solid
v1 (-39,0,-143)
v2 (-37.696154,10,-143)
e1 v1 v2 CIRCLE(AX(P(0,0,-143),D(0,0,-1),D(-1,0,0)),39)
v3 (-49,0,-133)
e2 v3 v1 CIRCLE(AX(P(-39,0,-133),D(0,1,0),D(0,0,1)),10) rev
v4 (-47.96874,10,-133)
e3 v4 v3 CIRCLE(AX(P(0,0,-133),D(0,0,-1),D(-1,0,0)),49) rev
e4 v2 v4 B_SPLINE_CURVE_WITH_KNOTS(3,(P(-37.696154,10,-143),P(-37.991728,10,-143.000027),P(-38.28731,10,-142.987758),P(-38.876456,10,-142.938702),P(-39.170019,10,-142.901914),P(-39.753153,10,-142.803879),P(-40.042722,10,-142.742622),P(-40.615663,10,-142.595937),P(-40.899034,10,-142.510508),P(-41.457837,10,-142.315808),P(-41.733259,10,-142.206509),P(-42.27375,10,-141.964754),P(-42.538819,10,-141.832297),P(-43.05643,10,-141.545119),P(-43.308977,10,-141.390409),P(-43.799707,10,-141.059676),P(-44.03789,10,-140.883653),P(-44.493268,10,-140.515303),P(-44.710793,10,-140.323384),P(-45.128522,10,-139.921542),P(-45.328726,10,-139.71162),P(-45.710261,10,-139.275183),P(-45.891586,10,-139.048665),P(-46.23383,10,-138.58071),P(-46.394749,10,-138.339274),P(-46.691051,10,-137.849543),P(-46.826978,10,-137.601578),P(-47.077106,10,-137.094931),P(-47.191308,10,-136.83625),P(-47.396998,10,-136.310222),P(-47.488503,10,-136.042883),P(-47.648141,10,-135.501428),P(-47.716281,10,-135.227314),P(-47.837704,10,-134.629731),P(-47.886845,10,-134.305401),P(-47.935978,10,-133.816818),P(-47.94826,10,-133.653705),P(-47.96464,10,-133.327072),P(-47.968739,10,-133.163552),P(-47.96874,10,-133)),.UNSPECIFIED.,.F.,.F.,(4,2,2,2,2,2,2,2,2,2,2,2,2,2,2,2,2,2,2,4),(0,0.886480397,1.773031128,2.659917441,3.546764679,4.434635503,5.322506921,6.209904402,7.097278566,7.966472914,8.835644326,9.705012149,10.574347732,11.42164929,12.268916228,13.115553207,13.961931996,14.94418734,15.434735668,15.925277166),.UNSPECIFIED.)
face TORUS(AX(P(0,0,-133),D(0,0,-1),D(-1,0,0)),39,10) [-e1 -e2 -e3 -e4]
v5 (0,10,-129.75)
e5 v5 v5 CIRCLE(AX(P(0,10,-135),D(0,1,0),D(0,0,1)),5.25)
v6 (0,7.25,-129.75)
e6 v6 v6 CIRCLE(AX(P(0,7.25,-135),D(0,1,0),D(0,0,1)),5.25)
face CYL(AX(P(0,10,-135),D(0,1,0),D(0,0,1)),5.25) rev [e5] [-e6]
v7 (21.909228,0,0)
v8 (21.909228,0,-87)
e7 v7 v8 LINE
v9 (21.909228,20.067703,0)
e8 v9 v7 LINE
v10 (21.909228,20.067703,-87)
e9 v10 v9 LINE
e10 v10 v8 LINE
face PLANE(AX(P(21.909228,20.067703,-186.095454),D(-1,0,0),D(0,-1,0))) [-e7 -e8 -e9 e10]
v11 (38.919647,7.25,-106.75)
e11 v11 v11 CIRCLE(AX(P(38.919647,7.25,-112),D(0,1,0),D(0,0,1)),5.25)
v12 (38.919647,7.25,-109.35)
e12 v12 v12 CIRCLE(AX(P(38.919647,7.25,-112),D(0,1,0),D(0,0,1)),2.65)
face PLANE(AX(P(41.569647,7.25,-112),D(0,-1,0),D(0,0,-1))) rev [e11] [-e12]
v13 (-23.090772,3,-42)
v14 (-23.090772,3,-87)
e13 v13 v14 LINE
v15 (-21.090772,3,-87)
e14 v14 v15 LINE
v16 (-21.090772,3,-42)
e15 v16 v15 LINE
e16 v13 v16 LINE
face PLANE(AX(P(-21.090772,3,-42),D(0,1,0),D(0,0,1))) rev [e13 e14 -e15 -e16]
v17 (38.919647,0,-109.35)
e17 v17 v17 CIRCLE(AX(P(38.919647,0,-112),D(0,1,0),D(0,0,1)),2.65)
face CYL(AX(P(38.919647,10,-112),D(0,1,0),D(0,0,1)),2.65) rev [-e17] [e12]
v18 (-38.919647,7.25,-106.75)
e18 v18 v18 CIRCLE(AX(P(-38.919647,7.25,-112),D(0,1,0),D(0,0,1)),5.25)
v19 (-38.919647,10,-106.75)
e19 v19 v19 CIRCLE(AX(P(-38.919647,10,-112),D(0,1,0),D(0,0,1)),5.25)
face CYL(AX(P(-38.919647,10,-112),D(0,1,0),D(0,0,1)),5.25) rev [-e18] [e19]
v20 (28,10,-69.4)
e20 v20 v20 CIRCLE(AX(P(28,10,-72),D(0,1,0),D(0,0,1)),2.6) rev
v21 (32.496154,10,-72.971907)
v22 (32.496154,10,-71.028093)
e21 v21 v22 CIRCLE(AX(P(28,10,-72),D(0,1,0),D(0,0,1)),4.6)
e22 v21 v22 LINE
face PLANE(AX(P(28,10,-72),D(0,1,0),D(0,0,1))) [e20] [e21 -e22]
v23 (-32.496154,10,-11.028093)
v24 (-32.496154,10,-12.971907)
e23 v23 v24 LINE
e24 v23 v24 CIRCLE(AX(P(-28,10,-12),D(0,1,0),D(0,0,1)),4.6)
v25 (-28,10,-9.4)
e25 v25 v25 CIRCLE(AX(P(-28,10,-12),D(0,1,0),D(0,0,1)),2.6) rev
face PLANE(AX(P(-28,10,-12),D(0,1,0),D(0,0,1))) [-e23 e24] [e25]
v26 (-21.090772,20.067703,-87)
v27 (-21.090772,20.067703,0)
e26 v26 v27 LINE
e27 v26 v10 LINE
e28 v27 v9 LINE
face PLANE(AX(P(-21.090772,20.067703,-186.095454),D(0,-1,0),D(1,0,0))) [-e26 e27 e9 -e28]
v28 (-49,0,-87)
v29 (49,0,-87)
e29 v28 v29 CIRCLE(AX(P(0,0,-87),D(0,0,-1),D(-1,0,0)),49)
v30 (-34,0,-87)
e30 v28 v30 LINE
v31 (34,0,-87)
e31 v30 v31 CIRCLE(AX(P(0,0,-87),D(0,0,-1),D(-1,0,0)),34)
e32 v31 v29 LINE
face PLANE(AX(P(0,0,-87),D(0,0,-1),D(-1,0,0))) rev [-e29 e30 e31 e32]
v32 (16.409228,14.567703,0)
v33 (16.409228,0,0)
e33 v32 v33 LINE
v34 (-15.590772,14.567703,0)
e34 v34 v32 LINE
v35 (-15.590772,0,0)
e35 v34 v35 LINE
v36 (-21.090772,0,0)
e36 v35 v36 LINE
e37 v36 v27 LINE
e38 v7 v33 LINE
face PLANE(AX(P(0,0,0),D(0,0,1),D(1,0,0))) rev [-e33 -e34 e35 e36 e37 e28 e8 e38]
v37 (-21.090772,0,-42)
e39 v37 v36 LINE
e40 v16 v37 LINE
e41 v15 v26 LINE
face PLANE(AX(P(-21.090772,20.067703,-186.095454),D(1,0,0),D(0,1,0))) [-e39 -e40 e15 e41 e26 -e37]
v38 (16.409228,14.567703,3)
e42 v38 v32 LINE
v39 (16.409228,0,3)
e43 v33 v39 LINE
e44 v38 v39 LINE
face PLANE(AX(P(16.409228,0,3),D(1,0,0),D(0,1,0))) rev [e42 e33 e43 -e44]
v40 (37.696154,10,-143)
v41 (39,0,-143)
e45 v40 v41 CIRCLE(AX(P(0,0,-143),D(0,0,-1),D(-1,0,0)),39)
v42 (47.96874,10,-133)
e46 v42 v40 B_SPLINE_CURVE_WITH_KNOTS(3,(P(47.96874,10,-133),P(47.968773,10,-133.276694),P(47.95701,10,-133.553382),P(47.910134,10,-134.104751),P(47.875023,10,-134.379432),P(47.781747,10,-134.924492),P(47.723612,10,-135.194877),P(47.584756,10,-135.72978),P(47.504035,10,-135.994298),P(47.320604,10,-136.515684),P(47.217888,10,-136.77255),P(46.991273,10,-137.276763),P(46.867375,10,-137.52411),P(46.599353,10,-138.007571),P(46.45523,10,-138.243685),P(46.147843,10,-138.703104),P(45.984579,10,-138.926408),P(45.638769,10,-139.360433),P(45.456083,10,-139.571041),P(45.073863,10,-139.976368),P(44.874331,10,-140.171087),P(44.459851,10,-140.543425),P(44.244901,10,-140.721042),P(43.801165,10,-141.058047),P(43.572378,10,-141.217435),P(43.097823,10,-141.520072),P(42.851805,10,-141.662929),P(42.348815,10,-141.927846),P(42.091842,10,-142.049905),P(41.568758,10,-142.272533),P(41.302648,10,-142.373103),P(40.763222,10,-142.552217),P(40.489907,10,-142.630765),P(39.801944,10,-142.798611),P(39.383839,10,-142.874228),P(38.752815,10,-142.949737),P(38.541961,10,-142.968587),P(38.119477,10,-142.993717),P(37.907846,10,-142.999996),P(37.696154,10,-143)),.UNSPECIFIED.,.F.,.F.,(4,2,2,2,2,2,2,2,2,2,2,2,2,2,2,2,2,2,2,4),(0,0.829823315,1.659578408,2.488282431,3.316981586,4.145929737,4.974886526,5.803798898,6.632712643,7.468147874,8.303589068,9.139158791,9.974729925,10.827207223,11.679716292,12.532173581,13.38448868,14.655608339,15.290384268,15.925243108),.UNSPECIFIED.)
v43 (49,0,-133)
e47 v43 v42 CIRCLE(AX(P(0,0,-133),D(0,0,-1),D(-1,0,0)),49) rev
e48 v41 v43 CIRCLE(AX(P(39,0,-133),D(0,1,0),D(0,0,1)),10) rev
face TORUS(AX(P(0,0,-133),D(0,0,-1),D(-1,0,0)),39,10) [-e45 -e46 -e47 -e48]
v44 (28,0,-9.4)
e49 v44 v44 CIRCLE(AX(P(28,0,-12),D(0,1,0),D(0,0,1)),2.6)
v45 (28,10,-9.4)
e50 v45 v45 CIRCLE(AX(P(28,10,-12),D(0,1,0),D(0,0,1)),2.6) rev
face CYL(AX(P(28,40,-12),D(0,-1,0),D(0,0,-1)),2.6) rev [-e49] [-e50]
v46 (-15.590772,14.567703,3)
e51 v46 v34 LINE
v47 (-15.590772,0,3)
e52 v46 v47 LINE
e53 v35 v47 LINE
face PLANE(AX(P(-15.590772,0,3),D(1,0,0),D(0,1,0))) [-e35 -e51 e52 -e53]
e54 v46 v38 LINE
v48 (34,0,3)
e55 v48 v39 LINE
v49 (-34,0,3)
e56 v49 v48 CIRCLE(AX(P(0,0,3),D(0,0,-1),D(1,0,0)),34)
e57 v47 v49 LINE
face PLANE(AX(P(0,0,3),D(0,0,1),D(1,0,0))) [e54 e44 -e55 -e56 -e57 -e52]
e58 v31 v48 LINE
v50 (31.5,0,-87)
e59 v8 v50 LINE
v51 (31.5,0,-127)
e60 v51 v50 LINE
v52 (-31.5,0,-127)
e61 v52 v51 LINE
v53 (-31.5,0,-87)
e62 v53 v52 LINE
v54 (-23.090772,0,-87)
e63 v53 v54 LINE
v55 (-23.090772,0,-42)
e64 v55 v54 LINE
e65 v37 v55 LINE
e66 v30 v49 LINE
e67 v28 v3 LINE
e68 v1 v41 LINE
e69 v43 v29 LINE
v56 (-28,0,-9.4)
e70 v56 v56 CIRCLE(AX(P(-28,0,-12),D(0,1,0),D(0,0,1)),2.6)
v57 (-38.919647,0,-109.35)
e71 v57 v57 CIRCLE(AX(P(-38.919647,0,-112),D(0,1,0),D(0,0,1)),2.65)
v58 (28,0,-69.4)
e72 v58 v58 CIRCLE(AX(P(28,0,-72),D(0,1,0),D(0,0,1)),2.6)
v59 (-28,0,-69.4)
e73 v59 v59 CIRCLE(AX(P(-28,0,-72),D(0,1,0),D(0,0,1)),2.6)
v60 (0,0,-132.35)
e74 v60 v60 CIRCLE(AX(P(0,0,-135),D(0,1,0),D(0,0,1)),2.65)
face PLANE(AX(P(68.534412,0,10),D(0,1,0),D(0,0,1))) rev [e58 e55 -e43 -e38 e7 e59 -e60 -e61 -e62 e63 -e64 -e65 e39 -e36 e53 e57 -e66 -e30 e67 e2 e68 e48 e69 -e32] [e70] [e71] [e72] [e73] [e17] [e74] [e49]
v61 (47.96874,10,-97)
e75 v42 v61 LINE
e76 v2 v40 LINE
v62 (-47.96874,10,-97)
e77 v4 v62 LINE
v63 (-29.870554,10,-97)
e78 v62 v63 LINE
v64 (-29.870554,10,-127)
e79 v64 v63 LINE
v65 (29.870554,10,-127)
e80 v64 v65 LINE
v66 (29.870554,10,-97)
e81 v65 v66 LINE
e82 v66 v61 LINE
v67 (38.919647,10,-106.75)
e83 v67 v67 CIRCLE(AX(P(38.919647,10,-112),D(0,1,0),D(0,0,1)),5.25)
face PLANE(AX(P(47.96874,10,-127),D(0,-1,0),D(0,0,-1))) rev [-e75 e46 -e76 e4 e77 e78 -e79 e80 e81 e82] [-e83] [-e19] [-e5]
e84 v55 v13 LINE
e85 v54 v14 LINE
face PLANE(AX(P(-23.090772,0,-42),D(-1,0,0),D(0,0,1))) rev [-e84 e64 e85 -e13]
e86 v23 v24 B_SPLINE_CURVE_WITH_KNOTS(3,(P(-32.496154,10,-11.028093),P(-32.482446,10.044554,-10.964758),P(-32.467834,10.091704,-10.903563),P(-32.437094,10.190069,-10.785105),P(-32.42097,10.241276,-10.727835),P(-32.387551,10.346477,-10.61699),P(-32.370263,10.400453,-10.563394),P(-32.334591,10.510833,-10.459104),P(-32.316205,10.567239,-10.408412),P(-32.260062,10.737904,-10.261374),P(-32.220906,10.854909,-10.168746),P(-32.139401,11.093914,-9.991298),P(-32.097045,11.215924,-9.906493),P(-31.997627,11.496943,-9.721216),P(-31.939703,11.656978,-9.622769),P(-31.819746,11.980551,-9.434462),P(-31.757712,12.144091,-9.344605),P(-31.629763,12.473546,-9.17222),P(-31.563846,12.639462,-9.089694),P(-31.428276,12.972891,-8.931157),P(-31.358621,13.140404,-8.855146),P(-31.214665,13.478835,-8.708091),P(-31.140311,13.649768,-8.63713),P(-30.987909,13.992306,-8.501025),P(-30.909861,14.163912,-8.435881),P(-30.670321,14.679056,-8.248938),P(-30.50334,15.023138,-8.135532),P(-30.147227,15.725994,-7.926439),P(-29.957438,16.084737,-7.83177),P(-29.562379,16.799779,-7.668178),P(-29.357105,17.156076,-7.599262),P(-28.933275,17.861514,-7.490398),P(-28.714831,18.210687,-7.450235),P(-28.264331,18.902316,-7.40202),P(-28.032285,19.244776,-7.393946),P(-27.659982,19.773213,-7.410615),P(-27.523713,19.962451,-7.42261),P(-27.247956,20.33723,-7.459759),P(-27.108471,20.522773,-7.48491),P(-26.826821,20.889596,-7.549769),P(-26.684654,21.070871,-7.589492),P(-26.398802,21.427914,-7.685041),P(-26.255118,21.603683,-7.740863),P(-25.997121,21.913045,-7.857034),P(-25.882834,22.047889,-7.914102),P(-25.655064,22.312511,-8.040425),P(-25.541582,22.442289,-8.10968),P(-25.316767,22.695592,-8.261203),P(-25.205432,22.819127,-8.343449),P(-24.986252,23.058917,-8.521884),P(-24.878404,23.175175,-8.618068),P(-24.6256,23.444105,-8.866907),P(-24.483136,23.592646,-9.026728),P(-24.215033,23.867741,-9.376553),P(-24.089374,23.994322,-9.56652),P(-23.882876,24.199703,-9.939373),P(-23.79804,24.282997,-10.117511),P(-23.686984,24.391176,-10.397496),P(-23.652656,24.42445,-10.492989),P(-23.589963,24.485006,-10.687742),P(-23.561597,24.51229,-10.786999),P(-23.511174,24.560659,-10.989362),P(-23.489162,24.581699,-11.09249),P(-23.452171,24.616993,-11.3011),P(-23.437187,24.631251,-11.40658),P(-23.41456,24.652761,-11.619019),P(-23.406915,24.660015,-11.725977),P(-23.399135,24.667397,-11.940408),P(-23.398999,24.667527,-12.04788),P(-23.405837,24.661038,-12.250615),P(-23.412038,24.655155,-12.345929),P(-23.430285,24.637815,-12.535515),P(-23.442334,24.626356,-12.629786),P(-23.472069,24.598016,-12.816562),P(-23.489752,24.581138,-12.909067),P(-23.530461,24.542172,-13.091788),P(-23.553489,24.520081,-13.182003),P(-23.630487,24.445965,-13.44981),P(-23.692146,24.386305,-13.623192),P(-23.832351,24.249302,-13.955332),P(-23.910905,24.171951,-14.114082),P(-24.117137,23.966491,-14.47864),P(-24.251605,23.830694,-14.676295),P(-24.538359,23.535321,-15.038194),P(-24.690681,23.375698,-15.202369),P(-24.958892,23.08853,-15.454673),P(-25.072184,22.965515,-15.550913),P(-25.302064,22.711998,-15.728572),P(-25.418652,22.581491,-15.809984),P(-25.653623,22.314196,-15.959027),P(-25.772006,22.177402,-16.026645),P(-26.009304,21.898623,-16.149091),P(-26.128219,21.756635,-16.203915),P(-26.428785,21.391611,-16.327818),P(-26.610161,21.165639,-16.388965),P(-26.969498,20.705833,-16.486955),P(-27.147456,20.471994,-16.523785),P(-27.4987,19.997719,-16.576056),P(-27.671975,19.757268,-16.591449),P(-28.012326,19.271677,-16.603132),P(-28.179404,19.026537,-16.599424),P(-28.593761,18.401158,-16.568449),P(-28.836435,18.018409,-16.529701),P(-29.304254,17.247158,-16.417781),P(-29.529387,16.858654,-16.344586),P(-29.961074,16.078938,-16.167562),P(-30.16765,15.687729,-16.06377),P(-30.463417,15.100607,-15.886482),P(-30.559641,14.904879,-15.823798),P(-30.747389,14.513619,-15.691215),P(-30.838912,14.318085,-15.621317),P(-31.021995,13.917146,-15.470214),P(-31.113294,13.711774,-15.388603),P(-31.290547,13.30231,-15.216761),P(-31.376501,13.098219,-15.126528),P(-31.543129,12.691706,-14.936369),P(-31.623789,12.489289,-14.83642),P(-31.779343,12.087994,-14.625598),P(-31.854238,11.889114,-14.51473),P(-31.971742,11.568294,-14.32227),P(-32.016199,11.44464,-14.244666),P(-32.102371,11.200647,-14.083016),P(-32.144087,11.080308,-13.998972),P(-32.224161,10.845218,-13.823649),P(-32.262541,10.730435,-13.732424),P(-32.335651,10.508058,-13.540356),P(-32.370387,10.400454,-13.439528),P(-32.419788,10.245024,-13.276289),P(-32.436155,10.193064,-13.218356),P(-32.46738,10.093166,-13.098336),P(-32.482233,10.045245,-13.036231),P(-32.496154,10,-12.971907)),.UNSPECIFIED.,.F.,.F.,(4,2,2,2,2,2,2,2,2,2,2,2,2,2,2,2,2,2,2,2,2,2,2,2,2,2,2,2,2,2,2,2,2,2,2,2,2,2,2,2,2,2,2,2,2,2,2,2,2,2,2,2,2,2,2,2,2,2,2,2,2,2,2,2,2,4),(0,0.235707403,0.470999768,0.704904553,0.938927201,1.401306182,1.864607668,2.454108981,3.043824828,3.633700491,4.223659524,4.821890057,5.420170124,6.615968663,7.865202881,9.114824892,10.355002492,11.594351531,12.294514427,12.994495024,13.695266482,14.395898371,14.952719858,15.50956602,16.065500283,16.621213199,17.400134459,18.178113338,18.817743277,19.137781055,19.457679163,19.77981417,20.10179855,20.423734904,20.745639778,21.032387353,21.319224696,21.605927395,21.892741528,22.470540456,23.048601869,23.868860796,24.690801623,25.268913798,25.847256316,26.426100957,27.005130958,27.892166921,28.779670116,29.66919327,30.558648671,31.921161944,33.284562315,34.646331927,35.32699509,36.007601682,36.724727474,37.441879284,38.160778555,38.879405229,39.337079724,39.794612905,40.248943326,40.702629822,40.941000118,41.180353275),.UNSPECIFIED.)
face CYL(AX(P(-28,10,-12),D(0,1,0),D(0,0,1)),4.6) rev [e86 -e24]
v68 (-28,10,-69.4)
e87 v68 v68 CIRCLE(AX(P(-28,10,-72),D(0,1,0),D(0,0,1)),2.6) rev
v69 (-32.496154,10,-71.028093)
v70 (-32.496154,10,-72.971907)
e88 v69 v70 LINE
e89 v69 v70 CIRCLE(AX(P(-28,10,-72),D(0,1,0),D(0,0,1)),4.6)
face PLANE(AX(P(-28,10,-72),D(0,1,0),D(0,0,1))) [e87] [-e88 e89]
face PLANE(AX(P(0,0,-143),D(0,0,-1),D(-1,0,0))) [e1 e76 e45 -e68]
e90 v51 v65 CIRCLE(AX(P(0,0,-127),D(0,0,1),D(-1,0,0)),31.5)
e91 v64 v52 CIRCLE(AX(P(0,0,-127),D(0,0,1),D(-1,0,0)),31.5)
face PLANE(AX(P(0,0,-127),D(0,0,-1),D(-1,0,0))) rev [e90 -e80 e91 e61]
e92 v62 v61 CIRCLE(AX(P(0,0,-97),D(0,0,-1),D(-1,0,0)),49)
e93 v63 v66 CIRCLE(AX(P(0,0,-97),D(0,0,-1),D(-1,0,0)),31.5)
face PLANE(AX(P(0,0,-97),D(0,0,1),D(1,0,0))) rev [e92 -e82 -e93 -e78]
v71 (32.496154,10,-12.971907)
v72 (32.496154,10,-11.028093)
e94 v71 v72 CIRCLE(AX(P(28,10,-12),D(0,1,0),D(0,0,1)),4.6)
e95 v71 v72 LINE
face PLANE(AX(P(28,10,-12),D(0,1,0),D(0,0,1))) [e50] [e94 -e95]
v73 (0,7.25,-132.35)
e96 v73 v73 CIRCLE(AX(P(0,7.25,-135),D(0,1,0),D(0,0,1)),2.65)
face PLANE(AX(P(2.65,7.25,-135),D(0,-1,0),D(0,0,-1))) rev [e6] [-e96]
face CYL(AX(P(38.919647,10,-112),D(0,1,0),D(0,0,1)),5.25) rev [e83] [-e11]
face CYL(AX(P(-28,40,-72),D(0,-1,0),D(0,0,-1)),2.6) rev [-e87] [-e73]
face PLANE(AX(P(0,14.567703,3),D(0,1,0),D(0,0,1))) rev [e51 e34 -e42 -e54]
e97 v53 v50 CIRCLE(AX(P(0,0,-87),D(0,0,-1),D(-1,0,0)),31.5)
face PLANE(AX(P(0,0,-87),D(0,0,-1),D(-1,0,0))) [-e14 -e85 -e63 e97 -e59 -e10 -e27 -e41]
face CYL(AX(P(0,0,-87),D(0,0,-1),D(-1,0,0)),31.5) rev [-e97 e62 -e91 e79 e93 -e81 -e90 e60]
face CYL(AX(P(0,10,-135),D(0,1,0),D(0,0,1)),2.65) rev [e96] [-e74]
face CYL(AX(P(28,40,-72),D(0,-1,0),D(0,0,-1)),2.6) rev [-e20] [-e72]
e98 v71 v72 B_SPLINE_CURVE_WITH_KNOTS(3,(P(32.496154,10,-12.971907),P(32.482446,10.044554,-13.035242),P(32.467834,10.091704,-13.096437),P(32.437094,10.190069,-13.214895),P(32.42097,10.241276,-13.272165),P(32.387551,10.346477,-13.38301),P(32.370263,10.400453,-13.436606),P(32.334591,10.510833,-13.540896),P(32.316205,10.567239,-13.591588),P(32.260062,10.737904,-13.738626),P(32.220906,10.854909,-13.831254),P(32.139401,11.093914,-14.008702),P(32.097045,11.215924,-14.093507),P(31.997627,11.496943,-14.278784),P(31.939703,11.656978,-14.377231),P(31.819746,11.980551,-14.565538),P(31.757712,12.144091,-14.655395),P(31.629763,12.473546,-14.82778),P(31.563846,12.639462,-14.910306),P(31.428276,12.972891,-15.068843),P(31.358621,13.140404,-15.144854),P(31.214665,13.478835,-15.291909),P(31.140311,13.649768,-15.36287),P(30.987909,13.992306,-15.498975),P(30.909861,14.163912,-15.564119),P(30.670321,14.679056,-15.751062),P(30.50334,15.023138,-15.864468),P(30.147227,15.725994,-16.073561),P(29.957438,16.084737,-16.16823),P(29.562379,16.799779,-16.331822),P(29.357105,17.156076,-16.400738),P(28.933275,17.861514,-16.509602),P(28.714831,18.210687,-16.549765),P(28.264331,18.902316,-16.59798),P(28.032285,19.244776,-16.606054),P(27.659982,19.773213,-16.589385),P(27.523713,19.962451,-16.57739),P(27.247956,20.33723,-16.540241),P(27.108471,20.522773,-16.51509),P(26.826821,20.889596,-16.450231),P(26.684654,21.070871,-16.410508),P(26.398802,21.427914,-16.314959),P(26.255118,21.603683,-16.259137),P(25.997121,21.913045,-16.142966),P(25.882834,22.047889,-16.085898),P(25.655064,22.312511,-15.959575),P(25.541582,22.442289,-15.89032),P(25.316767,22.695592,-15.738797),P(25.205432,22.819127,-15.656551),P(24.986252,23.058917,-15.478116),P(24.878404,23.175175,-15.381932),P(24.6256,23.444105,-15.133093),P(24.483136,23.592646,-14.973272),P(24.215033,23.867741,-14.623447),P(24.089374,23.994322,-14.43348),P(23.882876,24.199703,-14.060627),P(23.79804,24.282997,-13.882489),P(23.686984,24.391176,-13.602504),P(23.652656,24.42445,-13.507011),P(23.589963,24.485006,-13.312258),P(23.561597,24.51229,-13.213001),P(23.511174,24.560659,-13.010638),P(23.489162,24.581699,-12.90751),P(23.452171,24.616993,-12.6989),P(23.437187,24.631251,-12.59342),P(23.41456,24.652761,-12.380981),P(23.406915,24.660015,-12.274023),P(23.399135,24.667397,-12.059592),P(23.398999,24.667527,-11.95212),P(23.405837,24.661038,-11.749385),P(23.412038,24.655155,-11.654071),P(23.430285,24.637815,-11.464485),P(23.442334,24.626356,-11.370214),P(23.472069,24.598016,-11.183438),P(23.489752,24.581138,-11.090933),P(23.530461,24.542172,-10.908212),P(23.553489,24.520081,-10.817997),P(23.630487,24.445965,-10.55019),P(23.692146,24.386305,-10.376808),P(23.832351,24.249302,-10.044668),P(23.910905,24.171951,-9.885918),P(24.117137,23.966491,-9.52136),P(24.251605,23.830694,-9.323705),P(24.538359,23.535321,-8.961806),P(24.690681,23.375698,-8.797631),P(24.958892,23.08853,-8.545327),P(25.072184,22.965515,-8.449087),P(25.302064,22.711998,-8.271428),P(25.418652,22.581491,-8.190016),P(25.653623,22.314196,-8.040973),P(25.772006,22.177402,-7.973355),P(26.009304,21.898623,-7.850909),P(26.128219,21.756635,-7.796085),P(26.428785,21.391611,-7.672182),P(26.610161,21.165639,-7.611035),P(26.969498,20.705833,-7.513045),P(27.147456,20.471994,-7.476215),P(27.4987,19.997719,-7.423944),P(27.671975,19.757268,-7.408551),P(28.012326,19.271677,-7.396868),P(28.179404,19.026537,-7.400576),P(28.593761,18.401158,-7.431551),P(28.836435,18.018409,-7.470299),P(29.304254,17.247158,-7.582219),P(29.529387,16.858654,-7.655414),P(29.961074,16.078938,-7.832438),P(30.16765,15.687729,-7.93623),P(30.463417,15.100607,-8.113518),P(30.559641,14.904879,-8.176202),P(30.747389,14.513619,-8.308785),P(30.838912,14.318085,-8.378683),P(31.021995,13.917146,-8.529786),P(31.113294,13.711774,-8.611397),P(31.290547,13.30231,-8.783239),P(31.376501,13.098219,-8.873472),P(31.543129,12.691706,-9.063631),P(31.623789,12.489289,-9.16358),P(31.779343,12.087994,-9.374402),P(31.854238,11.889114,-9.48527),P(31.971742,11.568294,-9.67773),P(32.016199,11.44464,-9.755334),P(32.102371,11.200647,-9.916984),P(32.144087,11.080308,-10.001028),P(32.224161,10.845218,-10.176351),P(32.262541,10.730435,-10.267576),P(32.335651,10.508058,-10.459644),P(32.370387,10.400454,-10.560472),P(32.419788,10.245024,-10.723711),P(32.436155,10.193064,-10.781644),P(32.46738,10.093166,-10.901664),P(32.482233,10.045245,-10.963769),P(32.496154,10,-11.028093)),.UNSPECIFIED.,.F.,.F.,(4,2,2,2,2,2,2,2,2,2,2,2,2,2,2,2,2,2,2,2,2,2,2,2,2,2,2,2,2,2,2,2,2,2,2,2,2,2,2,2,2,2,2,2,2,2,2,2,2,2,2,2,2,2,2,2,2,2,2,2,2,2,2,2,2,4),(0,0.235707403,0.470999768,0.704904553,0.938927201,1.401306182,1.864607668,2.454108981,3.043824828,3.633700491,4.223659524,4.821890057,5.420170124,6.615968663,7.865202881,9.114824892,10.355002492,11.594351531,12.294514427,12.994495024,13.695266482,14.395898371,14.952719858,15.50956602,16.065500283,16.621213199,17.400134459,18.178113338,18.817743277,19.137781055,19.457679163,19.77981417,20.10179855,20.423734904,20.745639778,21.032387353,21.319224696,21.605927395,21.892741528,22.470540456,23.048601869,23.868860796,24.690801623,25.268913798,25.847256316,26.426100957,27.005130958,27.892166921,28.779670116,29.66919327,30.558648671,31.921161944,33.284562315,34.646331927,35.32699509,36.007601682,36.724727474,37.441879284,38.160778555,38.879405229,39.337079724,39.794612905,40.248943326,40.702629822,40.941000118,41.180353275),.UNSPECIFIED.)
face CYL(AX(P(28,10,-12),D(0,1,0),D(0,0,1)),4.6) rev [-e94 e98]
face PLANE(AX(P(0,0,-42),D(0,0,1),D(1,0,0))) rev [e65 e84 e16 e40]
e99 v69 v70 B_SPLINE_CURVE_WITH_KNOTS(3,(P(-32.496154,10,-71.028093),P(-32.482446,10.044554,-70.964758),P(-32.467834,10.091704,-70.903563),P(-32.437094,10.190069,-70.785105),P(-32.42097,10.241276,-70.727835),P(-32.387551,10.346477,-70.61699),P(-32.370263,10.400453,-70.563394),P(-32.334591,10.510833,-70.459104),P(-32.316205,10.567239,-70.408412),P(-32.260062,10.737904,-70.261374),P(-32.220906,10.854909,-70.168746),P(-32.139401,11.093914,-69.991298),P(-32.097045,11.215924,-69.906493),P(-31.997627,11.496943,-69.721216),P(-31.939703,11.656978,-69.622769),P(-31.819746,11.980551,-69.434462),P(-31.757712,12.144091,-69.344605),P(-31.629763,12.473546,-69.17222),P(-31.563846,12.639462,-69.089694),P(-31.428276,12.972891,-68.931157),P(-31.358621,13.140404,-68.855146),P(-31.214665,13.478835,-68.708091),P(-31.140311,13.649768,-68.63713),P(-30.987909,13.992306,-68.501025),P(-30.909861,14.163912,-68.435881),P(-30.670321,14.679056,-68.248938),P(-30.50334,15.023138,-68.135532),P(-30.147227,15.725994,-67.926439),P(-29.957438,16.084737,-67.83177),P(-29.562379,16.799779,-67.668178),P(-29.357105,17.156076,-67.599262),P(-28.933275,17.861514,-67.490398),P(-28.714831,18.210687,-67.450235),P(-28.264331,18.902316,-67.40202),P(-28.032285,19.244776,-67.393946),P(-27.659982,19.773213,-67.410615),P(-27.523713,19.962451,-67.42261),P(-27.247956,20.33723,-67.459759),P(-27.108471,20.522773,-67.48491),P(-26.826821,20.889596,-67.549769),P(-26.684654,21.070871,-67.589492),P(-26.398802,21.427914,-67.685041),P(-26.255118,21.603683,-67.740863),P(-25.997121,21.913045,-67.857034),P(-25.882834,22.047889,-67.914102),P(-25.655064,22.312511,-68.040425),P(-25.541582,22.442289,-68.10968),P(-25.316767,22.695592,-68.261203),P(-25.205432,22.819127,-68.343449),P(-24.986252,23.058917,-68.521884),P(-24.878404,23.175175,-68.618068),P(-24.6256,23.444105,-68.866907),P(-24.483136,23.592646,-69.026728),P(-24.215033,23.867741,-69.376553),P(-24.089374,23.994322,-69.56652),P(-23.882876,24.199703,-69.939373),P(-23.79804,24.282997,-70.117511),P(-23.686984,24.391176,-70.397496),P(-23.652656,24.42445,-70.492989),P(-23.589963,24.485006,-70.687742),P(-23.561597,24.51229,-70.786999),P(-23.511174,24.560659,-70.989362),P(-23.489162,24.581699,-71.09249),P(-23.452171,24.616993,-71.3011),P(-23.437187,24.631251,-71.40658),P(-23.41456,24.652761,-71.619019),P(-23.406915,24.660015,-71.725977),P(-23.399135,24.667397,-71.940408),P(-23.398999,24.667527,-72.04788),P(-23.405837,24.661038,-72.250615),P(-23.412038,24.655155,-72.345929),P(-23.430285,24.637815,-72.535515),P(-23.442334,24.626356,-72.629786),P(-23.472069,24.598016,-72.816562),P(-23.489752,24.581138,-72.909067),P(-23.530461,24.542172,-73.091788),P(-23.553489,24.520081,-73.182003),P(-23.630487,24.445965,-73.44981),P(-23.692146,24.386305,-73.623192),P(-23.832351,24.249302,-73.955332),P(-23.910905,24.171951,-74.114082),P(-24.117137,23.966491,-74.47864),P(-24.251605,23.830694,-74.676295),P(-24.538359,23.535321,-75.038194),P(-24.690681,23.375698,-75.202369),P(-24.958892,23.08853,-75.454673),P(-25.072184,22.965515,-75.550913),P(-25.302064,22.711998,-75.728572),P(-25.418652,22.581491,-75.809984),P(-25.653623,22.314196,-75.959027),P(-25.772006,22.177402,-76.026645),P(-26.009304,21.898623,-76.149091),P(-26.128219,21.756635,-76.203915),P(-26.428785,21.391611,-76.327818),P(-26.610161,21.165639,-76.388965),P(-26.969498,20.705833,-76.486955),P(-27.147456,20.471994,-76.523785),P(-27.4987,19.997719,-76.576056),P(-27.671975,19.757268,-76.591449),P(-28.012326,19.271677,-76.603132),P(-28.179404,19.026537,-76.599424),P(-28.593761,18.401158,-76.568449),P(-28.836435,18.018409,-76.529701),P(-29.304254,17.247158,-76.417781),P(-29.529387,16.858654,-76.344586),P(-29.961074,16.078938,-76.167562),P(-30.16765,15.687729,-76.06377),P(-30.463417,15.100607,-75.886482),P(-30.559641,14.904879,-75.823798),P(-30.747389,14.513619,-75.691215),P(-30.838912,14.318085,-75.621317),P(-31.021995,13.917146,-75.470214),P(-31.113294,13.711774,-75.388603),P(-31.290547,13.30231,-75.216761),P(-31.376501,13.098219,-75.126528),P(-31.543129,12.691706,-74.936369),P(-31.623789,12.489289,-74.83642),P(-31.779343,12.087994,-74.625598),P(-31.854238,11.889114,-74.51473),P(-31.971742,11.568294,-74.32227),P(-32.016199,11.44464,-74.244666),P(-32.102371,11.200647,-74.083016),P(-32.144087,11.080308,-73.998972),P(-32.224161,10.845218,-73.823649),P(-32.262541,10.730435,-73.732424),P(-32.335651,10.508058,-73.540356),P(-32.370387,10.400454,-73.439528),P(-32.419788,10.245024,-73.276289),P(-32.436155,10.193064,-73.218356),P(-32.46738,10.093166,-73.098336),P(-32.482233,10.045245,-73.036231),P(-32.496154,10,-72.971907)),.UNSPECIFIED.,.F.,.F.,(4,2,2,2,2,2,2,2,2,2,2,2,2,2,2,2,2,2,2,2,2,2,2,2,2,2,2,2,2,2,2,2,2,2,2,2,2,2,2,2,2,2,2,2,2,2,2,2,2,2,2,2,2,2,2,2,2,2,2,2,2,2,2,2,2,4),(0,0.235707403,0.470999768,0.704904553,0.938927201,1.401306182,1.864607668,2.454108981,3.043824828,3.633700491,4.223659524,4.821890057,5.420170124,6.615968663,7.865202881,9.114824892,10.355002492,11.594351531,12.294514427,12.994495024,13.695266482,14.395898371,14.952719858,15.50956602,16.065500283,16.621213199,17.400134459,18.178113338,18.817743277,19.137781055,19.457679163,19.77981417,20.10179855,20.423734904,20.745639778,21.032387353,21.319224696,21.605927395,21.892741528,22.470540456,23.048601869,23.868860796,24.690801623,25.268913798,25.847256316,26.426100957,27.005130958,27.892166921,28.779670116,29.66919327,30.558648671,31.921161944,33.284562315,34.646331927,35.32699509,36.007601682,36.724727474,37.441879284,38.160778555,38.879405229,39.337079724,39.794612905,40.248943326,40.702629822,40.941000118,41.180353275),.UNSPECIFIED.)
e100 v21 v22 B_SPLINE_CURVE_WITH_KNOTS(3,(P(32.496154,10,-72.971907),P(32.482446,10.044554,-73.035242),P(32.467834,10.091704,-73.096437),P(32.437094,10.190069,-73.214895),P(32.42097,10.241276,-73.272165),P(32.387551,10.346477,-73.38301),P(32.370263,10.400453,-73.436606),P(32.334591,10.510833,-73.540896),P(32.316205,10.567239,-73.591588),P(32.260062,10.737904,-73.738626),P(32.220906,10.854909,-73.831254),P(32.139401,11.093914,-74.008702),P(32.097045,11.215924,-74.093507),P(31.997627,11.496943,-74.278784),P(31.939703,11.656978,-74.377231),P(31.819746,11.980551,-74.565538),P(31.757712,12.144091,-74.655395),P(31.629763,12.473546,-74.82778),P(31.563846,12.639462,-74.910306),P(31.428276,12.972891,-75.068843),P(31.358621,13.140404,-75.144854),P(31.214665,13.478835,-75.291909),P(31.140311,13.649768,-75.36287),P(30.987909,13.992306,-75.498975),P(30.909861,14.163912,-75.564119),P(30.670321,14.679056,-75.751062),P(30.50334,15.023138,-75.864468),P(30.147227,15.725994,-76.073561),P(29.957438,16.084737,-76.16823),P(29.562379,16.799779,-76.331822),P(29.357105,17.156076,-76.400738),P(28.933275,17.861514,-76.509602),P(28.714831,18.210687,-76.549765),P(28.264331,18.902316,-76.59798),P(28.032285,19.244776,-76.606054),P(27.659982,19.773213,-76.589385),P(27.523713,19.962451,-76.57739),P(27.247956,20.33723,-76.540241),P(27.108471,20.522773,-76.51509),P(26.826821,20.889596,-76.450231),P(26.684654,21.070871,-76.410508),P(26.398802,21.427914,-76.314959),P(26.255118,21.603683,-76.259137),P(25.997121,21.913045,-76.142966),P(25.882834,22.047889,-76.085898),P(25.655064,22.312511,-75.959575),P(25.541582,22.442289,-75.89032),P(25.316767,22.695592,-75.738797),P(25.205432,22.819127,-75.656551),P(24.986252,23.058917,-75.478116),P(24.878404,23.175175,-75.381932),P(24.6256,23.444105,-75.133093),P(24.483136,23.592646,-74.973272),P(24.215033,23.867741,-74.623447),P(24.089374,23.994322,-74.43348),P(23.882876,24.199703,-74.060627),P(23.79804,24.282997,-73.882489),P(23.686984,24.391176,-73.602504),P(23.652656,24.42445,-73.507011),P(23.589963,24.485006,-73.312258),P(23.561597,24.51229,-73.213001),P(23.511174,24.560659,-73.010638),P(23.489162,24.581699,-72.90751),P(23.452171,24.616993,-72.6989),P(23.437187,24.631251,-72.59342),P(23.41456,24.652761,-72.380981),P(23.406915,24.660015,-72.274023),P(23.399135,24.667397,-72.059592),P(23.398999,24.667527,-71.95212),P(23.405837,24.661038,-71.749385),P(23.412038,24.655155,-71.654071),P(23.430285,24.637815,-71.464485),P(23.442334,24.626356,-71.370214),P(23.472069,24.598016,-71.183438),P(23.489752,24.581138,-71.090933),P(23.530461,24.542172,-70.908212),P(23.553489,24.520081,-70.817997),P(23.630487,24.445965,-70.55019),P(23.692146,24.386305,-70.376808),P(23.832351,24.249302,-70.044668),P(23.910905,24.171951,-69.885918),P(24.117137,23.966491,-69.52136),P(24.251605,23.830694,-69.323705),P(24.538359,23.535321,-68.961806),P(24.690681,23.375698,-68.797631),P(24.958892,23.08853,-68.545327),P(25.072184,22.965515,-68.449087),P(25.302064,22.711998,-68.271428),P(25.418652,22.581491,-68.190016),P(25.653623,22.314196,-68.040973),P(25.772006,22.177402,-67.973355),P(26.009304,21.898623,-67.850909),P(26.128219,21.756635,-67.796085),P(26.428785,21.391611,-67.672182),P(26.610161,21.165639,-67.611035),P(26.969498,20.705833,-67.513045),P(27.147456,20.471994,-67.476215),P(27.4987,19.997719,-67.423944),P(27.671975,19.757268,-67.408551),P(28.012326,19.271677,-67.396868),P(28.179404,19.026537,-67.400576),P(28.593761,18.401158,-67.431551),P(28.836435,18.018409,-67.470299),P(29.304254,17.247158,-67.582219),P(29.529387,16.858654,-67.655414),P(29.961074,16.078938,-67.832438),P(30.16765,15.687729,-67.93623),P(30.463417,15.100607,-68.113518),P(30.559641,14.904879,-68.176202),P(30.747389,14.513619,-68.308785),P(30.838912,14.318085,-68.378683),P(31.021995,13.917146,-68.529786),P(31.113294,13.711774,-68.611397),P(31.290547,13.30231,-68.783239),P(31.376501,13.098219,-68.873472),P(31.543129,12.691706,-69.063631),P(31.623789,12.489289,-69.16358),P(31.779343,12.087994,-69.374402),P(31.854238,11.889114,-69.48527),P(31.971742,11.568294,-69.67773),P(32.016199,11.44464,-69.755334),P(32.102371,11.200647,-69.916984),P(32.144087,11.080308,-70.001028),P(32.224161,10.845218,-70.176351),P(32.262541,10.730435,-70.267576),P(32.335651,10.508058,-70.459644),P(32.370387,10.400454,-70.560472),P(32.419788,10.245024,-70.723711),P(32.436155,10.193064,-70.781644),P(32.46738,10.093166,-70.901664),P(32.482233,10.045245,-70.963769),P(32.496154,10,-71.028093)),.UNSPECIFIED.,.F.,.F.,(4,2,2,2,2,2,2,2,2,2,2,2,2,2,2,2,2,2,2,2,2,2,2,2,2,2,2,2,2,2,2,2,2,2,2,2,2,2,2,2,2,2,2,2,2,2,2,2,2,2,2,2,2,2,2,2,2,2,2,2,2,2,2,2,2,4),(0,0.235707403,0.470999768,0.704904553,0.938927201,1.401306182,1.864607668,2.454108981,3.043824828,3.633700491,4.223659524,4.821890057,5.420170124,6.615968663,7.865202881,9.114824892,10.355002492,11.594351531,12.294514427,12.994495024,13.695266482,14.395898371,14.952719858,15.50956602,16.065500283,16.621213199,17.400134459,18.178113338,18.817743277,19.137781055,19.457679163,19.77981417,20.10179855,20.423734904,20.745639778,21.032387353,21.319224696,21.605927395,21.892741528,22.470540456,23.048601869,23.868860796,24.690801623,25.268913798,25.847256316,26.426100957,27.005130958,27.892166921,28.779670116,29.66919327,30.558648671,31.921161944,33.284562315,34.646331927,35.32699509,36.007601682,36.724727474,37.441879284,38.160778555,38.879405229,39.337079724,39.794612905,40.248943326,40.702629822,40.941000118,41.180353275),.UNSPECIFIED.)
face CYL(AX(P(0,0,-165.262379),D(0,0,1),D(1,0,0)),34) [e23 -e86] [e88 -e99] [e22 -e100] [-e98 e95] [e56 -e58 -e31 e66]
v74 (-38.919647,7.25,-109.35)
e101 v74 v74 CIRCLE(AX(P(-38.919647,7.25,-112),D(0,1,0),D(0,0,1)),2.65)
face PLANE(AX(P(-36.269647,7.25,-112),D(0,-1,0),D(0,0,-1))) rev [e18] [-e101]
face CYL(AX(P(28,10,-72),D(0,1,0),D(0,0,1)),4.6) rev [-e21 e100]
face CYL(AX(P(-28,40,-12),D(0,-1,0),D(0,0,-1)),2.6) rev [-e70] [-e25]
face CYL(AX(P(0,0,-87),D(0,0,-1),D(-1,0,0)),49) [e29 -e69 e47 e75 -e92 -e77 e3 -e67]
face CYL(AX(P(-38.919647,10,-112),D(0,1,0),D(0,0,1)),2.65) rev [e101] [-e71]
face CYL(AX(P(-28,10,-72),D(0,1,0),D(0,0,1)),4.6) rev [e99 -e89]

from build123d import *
from build123d.topology import SkipClean

# Parameters (mm, degrees)
ESQUISSE2_R                                      = 31.5
ESQUISSE2_W                                      = 32
ESQUISSE2_H                                      = 32
BOSS_EXTRU_1_DEPTH                               = 3
BOSS_EXTRU_2_START                               = -100
ESQUISSE4_R                                      = 35
ESQUISSE4_R_2                                    = 31.5
BOSS_EXTRU_2_DEPTH                               = 100
BOSS_EXTRU_3_OUTLINE_R                           = 31.5
BOSS_EXTRU_3_OUTLINE_W                           = 43
BOSS_EXTRU_3_OUTLINE_H                           = 42.5
BOSS_EXTRU_3_DEPTH                               = 97
ESQUISSE6_R                                      = 31.5
ENL_V_MAT_EXTRU_1_DEPTH                          = 10
ESQUISSE7_R                                      = 49
ESQUISSE7_R_2                                    = 35
BOSS_EXTRU_4_DEPTH                               = 10
BOSS_EXTRU_5_START                               = 30
BOSS_EXTRU_5_DEPTH                               = 30
BOSS_EXTRU_6_START                               = 16
BOSS_EXTRU_6_DEPTH                               = 16
CONG_1_R                                         = 10
ESQUISSE11_W                                     = 137.068824
ESQUISSE11_H                                     = 50.889867
ENL_V_MAT_EXTRU_2_DEPTH                          = 153
CHAMBRAGE_POUR_VIS_T_TE_RONDE_6_PANS_D           = 5.3
CHAMBRAGE_POUR_VIS_T_TE_RONDE_6_PANS_DEPTH       = 18
CHAMBRAGE_POUR_VIS_T_TE_RONDE_6_PANS_CBORE_D     = 10.5
CHAMBRAGE_POUR_VIS_T_TE_RONDE_6_PANS_CBORE_DEPTH = 2.75
CHAMBRAGE_POUR_VIS_T_TE_RONDE_6_PANS_TIP         = 1.592281
ESQUISSE18_R                                     = 2.6
ENL_V_MAT_EXTRU_4_DEPTH                          = 25
ESQUISSE19_R                                     = 4.6
ENL_V_MAT_EXTRU_5_DEPTH                          = 25
ESQUISSE20_W                                     = 2
ESQUISSE20_H                                     = 3
ENL_V_MAT_EXTRU_6_DEPTH                          = 45
ENL_V_START                                      = -90
ENL_V_MAT_EXTRU_7_DEPTH                          = 90


# Read off the part's stored shape, not the designer's step: Boss.-Extru.3
with BuildPart() as part:
    # Esquisse2 → Boss.-Extru.1 (new body)
    with BuildSketch(Plane.XY):
        Circle(ESQUISSE2_R)
        with Locations((0.409228, -1.432297)):
            Rectangle(ESQUISSE2_W, ESQUISSE2_H, mode=Mode.SUBTRACT)
    extrude(amount=BOSS_EXTRU_1_DEPTH)

    # Esquisse4 → Boss.-Extru.2 (add)
    with BuildSketch(Plane.XY.offset(3).offset(BOSS_EXTRU_2_START)):
        Circle(ESQUISSE4_R)
        Circle(ESQUISSE4_R_2, mode=Mode.SUBTRACT)
    extrude(amount=BOSS_EXTRU_2_DEPTH)

    # Boss.-Extru.3 outline → Boss.-Extru.3 (add)
    with BuildSketch(Plane(origin=(0, 0, 0), x_dir=(-1, 0, 0), z_dir=(0, 0, -1))):
        Circle(BOSS_EXTRU_3_OUTLINE_R)
        with Locations((-0.409228, -1.182297)):
            Rectangle(BOSS_EXTRU_3_OUTLINE_W, BOSS_EXTRU_3_OUTLINE_H, mode=Mode.SUBTRACT)
    extrude(amount=BOSS_EXTRU_3_DEPTH)

    # Esquisse6 → Enlèv. mat.-Extru.1 (cut)
    with BuildSketch(Plane(origin=(0, 0, -97), x_dir=(-1, 0, 0), z_dir=(0, 0, -1))):
        Circle(ESQUISSE6_R)
    extrude(amount=-ENL_V_MAT_EXTRU_1_DEPTH, mode=Mode.SUBTRACT)

    # Esquisse7 → Boss.-Extru.4 (add)
    with BuildSketch(Plane(origin=(0, 0, -97), x_dir=(-1, 0, 0), z_dir=(0, 0, -1))):
        Circle(ESQUISSE7_R)
        with Locations(Location((0, 0, 0), (0, 0, 180))):
            Circle(ESQUISSE7_R_2, mode=Mode.SUBTRACT)
    extrude(amount=-BOSS_EXTRU_4_DEPTH)

    # Esquisse8 → Boss.-Extru.5 (add)
    with SkipClean():  # the faces are left unmerged after this step: merging them gives an invalid solid
        with BuildSketch(Plane(origin=(0, 0, -97), x_dir=(-1, 0, 0), z_dir=(0, 0, -1)).offset(BOSS_EXTRU_5_START)):
            with BuildLine():
                Line((-47.96874, 10), (-29.870554, 10))
                ThreePointArc((-29.870554, 10), (-31.5, 0), (-29.870554, -10))
                Line((-29.870554, -10), (-47.96874, -10))
                ThreePointArc((-47.96874, -10), (-49, 0), (-47.96874, 10))
            make_face()
            with BuildLine():
                Line((29.870554, 10), (47.96874, 10))
                ThreePointArc((47.96874, 10), (49, 0), (47.96874, -10))
                Line((47.96874, -10), (29.870554, -10))
                ThreePointArc((29.870554, -10), (31.5, 0), (29.870554, 10))
            make_face()
        extrude(amount=-BOSS_EXTRU_5_DEPTH)

    # Esquisse10 → Boss.-Extru.6 (add)
    with SkipClean():  # the faces are left unmerged after this step: merging them gives an invalid solid
        with BuildSketch(Plane(origin=(0, 0, -127), x_dir=(-1, 0, 0), z_dir=(0, 0, -1)).offset(BOSS_EXTRU_6_START)):
            with BuildLine():
                Line((47.96874, 10), (-47.96874, 10))
                ThreePointArc((-47.96874, 10), (-49, 0), (-47.96874, -10))
                Line((-47.96874, -10), (47.96874, -10))
                ThreePointArc((47.96874, -10), (49, 0), (47.96874, 10))
            make_face()
        extrude(amount=-BOSS_EXTRU_6_DEPTH)

    # Congé1
    cong_1_edges = [part.edges().sort_by_distance(p)[0] for p in [
        (-49, 0, -143),
        (49, 0, -143),
    ]]
    fillet(cong_1_edges, radius=CONG_1_R)

    # Esquisse11 → Enlèv. mat.-Extru.2 (cut)
    with SkipClean():  # the faces are left unmerged after this step: merging them gives an invalid solid
        with BuildSketch(Plane(origin=(0, 0, -143), x_dir=(-1, 0, 0), z_dir=(0, 0, -1))):
            with Locations((0, -25.444933)):
                Rectangle(ESQUISSE11_W, ESQUISSE11_H)
        extrude(amount=-ENL_V_MAT_EXTRU_2_DEPTH, mode=Mode.SUBTRACT)

    # Chambrage pour Vis à tête ronde à 6 pans creux M51
    with Locations(Plane(origin=(0, 10, 0), x_dir=(1, 0, 0), z_dir=(0, 1, 0))):
        with Locations((-38.919647, 112), (38.919647, 112), (0, 135)):
            CounterBoreHole(CHAMBRAGE_POUR_VIS_T_TE_RONDE_6_PANS_D / 2, CHAMBRAGE_POUR_VIS_T_TE_RONDE_6_PANS_CBORE_D / 2, CHAMBRAGE_POUR_VIS_T_TE_RONDE_6_PANS_CBORE_DEPTH, depth=CHAMBRAGE_POUR_VIS_T_TE_RONDE_6_PANS_DEPTH)
            with Locations((0, 0, -(CHAMBRAGE_POUR_VIS_T_TE_RONDE_6_PANS_DEPTH + CHAMBRAGE_POUR_VIS_T_TE_RONDE_6_PANS_TIP / 2))):  # 118° drill point
                Cone(0, CHAMBRAGE_POUR_VIS_T_TE_RONDE_6_PANS_D / 2, CHAMBRAGE_POUR_VIS_T_TE_RONDE_6_PANS_TIP, mode=Mode.SUBTRACT)

    # Esquisse18 → Enlèv. mat.-Extru.4 (cut, symmetric)
    with SkipClean():  # the faces are left unmerged after this step: merging them gives an invalid solid
        with BuildSketch(Plane(origin=(0, 15, 0), x_dir=(-1, 0, 0), z_dir=(0, -1, 0))):
            with Locations(Location((28, 12, 0), (0, 0, 90))):
                Circle(ESQUISSE18_R)
            with Locations(Location((-28, 12, 0), (0, 0, 90))):
                Circle(ESQUISSE18_R)
            with Locations(Location((28, 72, 0), (0, 0, 90))):
                Circle(ESQUISSE18_R)
            with Locations(Location((-28, 72, 0), (0, 0, 90))):
                Circle(ESQUISSE18_R)
        extrude(amount=ENL_V_MAT_EXTRU_4_DEPTH, both=True, mode=Mode.SUBTRACT)

    # Esquisse19 → Enlèv. mat.-Extru.5 (cut)
    with SkipClean():  # the faces are left unmerged after this step: merging them gives an invalid solid
        with BuildSketch(Plane.ZX.offset(35)):
            with Locations((-72, 28)):
                Circle(ESQUISSE19_R)
            with Locations((-12, 28)):
                Circle(ESQUISSE19_R)
            with Locations((-12, -28)):
                Circle(ESQUISSE19_R)
            with Locations((-72, -28)):
                Circle(ESQUISSE19_R)
        extrude(amount=-ENL_V_MAT_EXTRU_5_DEPTH, mode=Mode.SUBTRACT)

    # Esquisse20 → Enlèv. mat.-Extru.6 (cut)
    with SkipClean():  # the faces are left unmerged after this step: merging them gives an invalid solid
        with BuildSketch(Plane(origin=(0, 0, -87), x_dir=(-1, 0, 0), z_dir=(0, 0, -1))):
            with Locations((22.090772, 1.5)):
                Rectangle(ESQUISSE20_W, ESQUISSE20_H)
        extrude(amount=-ENL_V_MAT_EXTRU_6_DEPTH, mode=Mode.SUBTRACT)

    # Esquisse21 → Enlèv. mat.-Extru.7 (cut)
    with SkipClean():  # the faces are left unmerged after this step: merging them gives an invalid solid
        with BuildSketch(Plane.XY.offset(3).offset(ENL_V_START)):
            with BuildLine():
                Line((-35, 0), (-34, 0))
                ThreePointArc((-34, 0), (0, 34), (34, 0))
                Line((34, 0), (35, 0))
                ThreePointArc((35, 0), (0, 35), (-35, 0))
            make_face()
        extrude(amount=ENL_V_MAT_EXTRU_7_DEPTH, mode=Mode.SUBTRACT)


solid = part.part
